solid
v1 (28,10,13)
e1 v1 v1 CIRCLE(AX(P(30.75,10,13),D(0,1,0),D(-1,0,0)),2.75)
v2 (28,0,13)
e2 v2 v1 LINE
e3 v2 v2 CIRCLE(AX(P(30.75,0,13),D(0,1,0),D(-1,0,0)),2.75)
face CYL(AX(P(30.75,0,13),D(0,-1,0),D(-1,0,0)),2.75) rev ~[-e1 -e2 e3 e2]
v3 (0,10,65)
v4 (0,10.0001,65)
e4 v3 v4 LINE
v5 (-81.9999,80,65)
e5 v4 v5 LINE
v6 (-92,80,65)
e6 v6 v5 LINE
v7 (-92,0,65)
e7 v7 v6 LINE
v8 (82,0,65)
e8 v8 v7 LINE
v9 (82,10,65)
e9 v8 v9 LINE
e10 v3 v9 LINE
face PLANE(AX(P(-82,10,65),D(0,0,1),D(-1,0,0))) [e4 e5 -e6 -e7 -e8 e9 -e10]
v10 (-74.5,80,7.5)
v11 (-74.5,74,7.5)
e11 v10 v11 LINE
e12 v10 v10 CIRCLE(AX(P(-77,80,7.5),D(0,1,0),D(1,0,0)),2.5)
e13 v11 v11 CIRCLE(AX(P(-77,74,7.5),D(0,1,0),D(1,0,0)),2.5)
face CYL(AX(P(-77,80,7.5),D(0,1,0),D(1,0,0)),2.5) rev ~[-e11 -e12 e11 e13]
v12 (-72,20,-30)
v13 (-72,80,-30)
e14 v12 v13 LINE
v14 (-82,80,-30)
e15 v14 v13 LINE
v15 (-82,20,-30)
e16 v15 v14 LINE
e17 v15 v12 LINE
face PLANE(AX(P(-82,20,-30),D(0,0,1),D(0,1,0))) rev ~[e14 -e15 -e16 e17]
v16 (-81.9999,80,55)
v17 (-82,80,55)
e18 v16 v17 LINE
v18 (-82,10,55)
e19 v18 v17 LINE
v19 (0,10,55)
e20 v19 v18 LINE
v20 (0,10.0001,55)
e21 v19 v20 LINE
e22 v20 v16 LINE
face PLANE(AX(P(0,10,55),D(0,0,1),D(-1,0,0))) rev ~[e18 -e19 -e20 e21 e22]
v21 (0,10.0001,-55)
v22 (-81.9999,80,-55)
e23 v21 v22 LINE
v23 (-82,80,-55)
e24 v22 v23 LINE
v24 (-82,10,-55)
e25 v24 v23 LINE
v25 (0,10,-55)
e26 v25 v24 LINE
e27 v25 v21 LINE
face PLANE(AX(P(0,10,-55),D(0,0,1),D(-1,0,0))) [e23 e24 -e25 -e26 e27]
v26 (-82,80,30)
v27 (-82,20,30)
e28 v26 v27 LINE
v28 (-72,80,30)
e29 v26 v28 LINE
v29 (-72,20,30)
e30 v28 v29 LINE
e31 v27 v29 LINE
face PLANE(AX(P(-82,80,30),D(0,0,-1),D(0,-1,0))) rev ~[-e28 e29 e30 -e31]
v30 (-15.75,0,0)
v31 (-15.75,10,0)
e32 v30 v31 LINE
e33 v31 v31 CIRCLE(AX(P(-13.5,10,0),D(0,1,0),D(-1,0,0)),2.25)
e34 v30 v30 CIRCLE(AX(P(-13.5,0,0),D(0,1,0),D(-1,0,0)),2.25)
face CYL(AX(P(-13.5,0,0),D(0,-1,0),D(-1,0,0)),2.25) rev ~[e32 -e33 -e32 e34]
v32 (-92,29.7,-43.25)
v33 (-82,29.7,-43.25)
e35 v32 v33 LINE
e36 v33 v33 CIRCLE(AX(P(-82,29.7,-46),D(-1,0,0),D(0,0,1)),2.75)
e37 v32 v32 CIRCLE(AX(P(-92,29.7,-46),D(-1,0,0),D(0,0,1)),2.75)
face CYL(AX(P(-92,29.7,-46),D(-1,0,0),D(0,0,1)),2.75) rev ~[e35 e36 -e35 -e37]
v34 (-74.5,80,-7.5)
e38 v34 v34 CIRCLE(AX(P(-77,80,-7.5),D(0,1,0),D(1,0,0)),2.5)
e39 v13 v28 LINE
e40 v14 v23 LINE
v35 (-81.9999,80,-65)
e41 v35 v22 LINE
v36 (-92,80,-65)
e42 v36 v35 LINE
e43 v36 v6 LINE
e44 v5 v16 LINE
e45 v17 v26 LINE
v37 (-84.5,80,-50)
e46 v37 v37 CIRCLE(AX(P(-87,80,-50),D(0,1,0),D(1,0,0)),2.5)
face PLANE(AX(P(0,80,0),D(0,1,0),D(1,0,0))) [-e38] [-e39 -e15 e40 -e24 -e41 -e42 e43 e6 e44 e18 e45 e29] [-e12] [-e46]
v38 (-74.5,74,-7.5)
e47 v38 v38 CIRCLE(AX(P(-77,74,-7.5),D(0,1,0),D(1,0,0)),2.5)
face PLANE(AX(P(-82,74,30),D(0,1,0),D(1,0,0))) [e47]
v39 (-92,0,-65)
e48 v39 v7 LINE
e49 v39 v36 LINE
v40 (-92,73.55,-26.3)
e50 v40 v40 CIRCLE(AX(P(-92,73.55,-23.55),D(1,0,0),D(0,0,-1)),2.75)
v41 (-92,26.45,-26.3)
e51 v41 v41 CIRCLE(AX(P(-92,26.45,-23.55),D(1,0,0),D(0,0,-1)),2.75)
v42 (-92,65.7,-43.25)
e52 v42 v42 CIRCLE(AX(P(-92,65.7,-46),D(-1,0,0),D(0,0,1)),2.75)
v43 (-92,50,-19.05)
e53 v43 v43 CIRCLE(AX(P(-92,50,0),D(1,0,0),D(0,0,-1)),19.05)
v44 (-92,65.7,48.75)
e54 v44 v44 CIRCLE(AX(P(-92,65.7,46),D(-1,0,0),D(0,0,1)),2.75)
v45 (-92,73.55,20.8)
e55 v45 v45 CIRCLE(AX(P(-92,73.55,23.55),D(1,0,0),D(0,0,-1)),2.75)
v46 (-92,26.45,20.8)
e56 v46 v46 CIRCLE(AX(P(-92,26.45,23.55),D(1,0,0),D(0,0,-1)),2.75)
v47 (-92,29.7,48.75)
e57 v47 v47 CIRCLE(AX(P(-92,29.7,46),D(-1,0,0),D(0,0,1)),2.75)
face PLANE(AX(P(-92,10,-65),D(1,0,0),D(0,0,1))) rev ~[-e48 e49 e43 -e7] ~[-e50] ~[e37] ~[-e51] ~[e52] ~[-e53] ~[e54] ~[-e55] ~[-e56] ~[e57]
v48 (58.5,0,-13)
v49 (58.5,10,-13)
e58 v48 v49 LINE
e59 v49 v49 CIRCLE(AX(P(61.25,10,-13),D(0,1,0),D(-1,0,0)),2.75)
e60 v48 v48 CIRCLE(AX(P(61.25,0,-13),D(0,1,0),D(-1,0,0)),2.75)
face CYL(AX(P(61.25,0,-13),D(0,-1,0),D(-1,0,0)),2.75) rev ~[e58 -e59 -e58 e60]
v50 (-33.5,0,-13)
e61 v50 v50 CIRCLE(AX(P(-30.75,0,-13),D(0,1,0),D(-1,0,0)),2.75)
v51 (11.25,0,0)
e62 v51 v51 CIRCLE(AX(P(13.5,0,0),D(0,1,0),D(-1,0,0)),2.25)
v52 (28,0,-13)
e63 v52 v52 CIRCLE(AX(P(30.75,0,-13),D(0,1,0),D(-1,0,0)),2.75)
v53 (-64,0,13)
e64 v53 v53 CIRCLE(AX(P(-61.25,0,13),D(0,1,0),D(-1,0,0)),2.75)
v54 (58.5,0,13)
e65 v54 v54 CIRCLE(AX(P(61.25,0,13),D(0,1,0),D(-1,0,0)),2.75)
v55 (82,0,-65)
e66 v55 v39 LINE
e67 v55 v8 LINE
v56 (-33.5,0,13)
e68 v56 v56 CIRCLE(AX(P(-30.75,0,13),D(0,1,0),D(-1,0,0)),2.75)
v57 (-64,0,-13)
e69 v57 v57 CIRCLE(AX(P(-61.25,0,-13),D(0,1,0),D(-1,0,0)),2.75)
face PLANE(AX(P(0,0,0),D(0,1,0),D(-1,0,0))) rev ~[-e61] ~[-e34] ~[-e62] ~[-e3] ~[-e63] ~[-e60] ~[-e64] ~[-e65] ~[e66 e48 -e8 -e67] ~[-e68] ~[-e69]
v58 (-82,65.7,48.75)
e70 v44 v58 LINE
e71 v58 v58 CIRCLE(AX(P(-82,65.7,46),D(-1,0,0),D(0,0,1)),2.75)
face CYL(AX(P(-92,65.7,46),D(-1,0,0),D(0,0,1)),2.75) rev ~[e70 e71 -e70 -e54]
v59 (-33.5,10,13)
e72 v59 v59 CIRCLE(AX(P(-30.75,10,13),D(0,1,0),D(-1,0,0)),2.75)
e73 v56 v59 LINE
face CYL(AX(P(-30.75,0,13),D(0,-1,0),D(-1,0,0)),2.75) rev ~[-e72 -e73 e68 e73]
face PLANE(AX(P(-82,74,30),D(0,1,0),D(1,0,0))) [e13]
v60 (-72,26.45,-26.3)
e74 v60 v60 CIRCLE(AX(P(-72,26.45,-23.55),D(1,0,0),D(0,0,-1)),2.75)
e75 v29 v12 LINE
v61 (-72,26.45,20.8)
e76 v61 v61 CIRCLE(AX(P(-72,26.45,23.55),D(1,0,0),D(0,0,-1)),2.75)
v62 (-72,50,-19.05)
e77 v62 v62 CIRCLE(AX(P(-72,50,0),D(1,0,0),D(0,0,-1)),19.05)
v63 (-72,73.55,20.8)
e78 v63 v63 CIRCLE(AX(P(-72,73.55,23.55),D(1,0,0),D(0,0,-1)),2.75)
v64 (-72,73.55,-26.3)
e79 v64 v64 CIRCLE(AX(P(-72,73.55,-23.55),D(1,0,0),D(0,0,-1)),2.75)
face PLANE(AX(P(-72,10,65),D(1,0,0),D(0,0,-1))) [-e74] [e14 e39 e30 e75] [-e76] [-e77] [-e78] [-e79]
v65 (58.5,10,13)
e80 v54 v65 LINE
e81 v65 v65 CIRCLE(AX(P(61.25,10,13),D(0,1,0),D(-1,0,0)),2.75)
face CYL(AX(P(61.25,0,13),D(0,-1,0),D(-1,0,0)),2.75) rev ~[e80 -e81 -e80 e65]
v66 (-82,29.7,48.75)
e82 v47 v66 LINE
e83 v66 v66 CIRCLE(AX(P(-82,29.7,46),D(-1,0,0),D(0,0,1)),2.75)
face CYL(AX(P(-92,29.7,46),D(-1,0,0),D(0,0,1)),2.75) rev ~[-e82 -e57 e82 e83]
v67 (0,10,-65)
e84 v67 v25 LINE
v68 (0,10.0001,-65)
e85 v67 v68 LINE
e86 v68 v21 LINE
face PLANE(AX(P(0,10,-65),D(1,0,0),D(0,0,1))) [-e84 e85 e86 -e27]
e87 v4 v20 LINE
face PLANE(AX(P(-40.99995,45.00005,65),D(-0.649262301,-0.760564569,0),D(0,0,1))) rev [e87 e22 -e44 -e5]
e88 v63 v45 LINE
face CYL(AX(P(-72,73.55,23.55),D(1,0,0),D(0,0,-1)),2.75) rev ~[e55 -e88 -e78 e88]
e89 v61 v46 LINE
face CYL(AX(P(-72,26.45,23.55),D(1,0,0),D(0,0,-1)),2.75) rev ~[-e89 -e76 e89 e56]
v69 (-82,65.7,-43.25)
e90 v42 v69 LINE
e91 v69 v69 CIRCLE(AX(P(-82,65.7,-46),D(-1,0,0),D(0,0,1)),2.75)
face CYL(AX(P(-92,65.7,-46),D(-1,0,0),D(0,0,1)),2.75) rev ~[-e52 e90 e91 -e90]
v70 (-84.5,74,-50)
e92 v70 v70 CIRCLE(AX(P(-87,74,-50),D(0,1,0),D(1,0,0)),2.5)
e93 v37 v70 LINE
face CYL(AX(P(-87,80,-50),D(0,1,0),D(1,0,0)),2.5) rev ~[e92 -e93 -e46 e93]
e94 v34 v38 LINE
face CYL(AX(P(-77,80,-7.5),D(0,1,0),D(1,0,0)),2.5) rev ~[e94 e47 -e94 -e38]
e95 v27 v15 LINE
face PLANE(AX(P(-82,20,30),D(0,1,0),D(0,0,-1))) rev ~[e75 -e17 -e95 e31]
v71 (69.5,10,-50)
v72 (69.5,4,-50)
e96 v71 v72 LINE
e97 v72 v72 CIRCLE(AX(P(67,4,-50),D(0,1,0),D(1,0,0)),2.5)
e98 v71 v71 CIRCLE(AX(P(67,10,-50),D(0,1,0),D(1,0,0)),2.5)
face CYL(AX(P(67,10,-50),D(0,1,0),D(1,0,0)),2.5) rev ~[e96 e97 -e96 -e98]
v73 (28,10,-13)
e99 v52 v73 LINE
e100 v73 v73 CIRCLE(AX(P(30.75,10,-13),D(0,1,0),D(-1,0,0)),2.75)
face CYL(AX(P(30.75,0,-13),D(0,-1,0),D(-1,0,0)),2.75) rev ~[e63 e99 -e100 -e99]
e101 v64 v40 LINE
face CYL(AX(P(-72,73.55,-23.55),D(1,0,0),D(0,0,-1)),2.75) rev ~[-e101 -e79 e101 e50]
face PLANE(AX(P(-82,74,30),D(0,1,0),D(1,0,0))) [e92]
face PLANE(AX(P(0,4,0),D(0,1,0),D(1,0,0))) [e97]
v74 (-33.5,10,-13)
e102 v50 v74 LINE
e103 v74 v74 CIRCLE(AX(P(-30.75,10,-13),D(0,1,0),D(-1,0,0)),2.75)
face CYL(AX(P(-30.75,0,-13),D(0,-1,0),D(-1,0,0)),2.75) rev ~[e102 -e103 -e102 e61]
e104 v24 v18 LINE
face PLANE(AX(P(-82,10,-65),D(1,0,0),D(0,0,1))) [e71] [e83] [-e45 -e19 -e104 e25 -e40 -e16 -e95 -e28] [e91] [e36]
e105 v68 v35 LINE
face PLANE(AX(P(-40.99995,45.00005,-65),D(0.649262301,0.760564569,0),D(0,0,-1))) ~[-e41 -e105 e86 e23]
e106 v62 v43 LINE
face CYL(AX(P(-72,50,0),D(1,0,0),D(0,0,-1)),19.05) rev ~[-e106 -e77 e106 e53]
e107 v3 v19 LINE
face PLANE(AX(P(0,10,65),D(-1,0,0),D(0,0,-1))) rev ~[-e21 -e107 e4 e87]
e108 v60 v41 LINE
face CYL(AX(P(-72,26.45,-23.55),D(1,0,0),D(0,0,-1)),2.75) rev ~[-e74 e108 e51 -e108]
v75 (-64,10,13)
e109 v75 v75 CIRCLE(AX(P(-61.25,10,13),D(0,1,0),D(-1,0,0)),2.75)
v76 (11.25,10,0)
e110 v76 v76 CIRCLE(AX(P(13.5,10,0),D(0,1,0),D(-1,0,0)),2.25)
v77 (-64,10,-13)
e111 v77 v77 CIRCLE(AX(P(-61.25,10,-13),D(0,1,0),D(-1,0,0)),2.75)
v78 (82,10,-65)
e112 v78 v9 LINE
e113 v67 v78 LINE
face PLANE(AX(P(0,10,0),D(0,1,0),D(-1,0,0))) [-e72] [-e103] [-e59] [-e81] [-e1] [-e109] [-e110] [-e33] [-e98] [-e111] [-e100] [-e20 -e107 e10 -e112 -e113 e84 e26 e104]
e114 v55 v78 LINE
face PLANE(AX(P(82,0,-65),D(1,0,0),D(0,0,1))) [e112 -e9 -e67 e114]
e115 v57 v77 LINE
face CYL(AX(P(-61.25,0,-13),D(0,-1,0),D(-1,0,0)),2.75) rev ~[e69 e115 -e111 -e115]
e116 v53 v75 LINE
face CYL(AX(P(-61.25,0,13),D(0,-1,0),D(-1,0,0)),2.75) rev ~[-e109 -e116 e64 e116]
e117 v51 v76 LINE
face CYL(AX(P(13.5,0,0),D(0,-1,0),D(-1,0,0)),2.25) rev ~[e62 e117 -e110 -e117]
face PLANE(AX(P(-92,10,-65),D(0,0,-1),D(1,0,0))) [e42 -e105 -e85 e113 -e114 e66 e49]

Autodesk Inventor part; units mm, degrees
ref_plane "YZ Plane" through (0, 0, 0) normal (1, 0, 0) x (0, 1, 0)
ref_plane "XZ Plane" through (0, 0, 0) normal (0, 1, 0) x (-1, 0, 0)
ref_plane "XY Plane" through (0, 0, 0) normal (0, 0, 1) x (1, 0, 0)
sketch "Sketch1" plane through (0, 0, 0) normal (0, 1, 0) x (-1, 0, 0)
  line L0 (20, -4.85) -> (-20, -4.85) construction
  line L1 (-20, -4.85) -> (-20, 4.85) construction
  line L2 (-20, 4.85) -> (20, 4.85) construction
  line L3 (20, 4.85) -> (20, -4.85) construction
  line L4 (0, -4.85) -> (0, 4.85) construction
  line L5 (20, 0) -> (-20, 0) construction
  circle A0 centre (13.5, 0) radius 2.25
  circle A1 centre (-13.5, 0) radius 2.25
  line L6 (67, -18) -> (25, -18) construction
  line L7 (25, -18) -> (25, 18) construction
  line L8 (25, 18) -> (67, 18) construction
  line L9 (67, 18) -> (67, -18) construction
  line L10 (46, -18) -> (46, 18) construction
  line L11 (67, 0) -> (25, 0) construction
  circle A2 centre (61.25, -13) radius 2.75
  circle A3 centre (30.75, -13) radius 2.75
  circle A4 centre (61.25, 13) radius 2.75
  circle A5 centre (30.75, 13) radius 2.75
  line L12 (-67, -18) -> (-25, -18) construction
  line L13 (-25, -18) -> (-25, 18) construction
  line L14 (-25, 18) -> (-67, 18) construction
  line L15 (-67, 18) -> (-67, -18) construction
  line L16 (-46, -18) -> (-46, 18) construction
  line L17 (-67, 0) -> (-25, 0) construction
  circle A6 centre (-61.25, -13) radius 2.75
  circle A7 centre (-30.75, -13) radius 2.75
  circle A8 centre (-61.25, 13) radius 2.75
  circle A9 centre (-30.75, 13) radius 2.75
  line L18 (82, -65) -> (-82, -65)
  line L19 (-82, -65) -> (-82, 65)
  line L20 (-82, 65) -> (82, 65)
  line L21 (82, 65) -> (82, -65)
  point P0 (0, 0)
  point P1 (0, 0)
  dimension "d0" = 40
  dimension "d1" = 9.7
  dimension "d2" = 4.5
  dimension "d3" = 27
  dimension "d4" = 42
  dimension "d6" = 36
  dimension "d7" = 5
  dimension "d8" = 5.5
  dimension "d9" = 30.5
  dimension "d10" = 26
  dimension "d12" = 15
  dimension "d16" = 130
extrude "Extrusion1" add sketch "Sketch1" along normal blind 10
sketch "Sketch5" plane through (-82, 0, -65) normal (-1, 0, 0) x (0, 0, 1)
  line L0 (0, 0) -> (130, 0) projected
  line L1 (130, 0) -> (130, 10) projected
  line L2 (0, 10) -> (130, 10) projected
  line L3 (0, 0) -> (0, 10) projected
  point P0 (65, 0)
extrude "Extrusion4" add sketch "Sketch5" along normal blind 10
sketch "Sketch6" plane through (0, 10, 0) normal (0, 1, 0) x (1, 0, 0)
  line L0 (-92, 65) -> (-92, -65) projected
  line L1 (82, -65) -> (-92, -65) projected
  line L2 (-92, 65) -> (-82, 65)
  line L3 (-82, 65) -> (-82, -65)
  line L4 (-82, -65) -> (-92, -65)
  line L5 (-92, -65) -> (-92, 65)
  point P0 (0, 0)
  dimension "d33" = 10
extrude "Extrusion5" add sketch "Sketch6" along normal blind 80
sketch "Sketch7" plane through (-82, 10, 65) normal (1, 0, 0) x (0, 0, -1)
  line L0 (35, 10) -> (95, 10)
  line L1 (95, 10) -> (95, 70)
  line L2 (95, 70) -> (35, 70)
  line L3 (35, 70) -> (35, 10)
  line L4 (130, 80) -> (0, 80) construction
  line L5 (65, 80) -> (65, 0) construction
  line L6 (62.75, 0) -> (67.25, 0) construction
  line L7 (0, -10) -> (0, 80) construction
  line L8 (130, -10) -> (130, 80) construction
  line L9 (130, 40) -> (0, 40) construction
  point P0 (65, -10)
  dimension "d36" = 60
  dimension "d37" = 60
  dimension "d38" = 40
extrude "Extrusion6" add sketch "Sketch7" along normal blind 10
sketch "Sketch8" plane through (0, 90, 0) normal (0, 1, 0) x (1, 0, 0)
  line L0 (-92, 65) -> (-92, -65) projected
  line L1 (-92, -65) -> (-82, -65) projected
  line L2 (-82, -65) -> (-82, 65) projected
  line L3 (-82, 65) -> (-92, 65) projected
  point P0 (0, 0)
extrude "Extrusion7" cut sketch "Sketch8" against normal up to surface (10 mm away)
sketch "Sketch9" plane through (-72, 10, 65) normal (1, 0, 0) x (0, 0, -1)
  line L0 (95, 10) -> (95, 70) construction
  line L1 (95, 70) -> (35, 70) construction
  line L2 (35, 70) -> (35, 10) construction
  line L3 (35, 10) -> (95, 10) construction
  line L4 (35, 10) -> (35, 70) construction
  line L5 (35, 40) -> (95, 40) construction
  line L6 (95, 10) -> (95, 70) construction
  line L7 (35, 10) -> (95, 10) construction
  line L8 (65, 10) -> (65, 70) construction
  line L9 (95, 70) -> (35, 70) construction
  line L10 (41.45, 63.55) -> (88.55, 63.55) construction
  line L11 (88.55, 63.55) -> (88.55, 16.45) construction
  line L12 (88.55, 16.45) -> (41.45, 16.45) construction
  line L13 (41.45, 16.45) -> (41.45, 63.55) construction
  circle A0 centre (41.45, 63.55) radius 2.75
  circle A1 centre (41.45, 16.45) radius 2.75
  circle A2 centre (88.55, 16.45) radius 2.75
  circle A3 centre (88.55, 63.55) radius 2.75
  circle A4 centre (65, 40) radius 19.05
  point P0 (65, -10)
  dimension "d43" = 47.1
  dimension "d44" = 47.1
  dimension "d45" = 5.5
  dimension "d46" = 5.5
  dimension "d47" = 5.5
  dimension "d48" = 5.5
  dimension "d51" = 38.1
extrude "Extrusion8" cut sketch "Sketch9" against normal through all
sketch "Sketch10" plane through (-92, 0, -65) normal (-1, 0, 0) x (0, 0, 1)
  circle A0 centre (65, 50) radius 19.05 projected
  line L0 (65, 50) -> (0, 50) construction
  line L1 (0, 10) -> (0, 80) projected
  line L2 (65, 50) -> (130, 50) construction
  line L3 (130, 10) -> (130, 80) projected
  line L4 (5, 71.2) -> (33, 71.2) construction
  line L5 (33, 71.2) -> (33, 24.2) construction
  line L6 (33, 24.2) -> (5, 24.2) construction
  line L7 (5, 24.2) -> (5, 71.2) construction
  line L8 (5, 47.7) -> (33, 47.7) construction
  line L9 (65, 50) -> (65, 0) construction
  line L10 (19, 71.2) -> (19, 24.2) construction
  circle A1 centre (19, 65.7) radius 2.75
  circle A2 centre (19, 29.7) radius 2.75
  circle A3 centre (111, 65.7) radius 2.75
  circle A4 centre (111, 29.7) radius 2.75
  point P0 (180, 80)
  dimension "d52" = 28
  dimension "d53" = 47
  dimension "d54" = 2.3
  dimension "d55" = 46
  dimension "d56" = 5.5
  dimension "d57" = 36
extrude "Extrusion9" cut sketch "Sketch10" against normal through all contours A1 | A2 | A3 | A4
sketch "Sketch12" plane through (0, 10, 0) normal (0, 1, 0) x (1, 0, 0)
  line L0 (82, 65) -> (-82, 65) projected
  line L1 (-82, 65) -> (0, 65)
  line L2 (0, 65) -> (0, 55)
  line L3 (0, 55) -> (-82, 55)
  line L4 (-82, 55) -> (-82, 65)
  line L5 (82, -65) -> (82, 65) construction
  line L6 (82, 0) -> (-92, 0) construction
  line L7 (-92, 65) -> (-92, -65) construction
  line L8 (-82, -65) -> (0, -65)
  line L9 (0, -65) -> (0, -55)
  line L10 (0, -55) -> (-82, -55)
  line L11 (-82, -55) -> (-82, -65)
  point P0 (0, 0)
  dimension "d70" = 82
  dimension "d71" = 10
extrude "Extrusion11" add sketch "Sketch12" along normal up to surface (70 mm away)
chamfer "Chamfer3" distance 70 distance2 82 1 edges at (0, 80, -60) measured on face at (0, 33.3333, -58.3333)
chamfer "Chamfer4" distance 70 distance2 82 1 edges at (0, 80, 60) measured on face at (0, 33.3333, 61.6667)
sketch "Sketch14" plane through (-82, 80, 30) normal (0, 1, 0) x (1, 0, 0)
  line L0 (10, 0) -> (10, 60) construction
  line L1 (-10, 95) -> (-10, -35) construction
  line L2 (10, 0) -> (-10, 0) construction
  line L3 (-10, 0) -> (-10, 60) construction
  line L4 (-10, 60) -> (10, 60) construction
  line L5 (10, 60) -> (10, 0) construction
  line L6 (10, 30) -> (-10, 30) construction
  circle A0 centre (5, 22.5) radius 2.5
  circle A1 centre (5, 37.5) radius 2.5
  point P0 (82, 30)
  dimension "d83" = 60
  dimension "d84" = 5
  dimension "d85" = 15
  dimension "d86" = 15
extrude "Extrusion12" cut sketch "Sketch14" against normal blind 6
sketch "Sketch15" plane through (0, 10, 0) normal (0, 1, 0) x (1, 0, 0)
  line L0 (82, 65) -> (0, 65) construction
  line L1 (82, 65) -> (67, 65) construction
  line L2 (67, 65) -> (67, 50) construction
  line L3 (67, 50) -> (82, 50) construction
  line L4 (82, 50) -> (82, 65) construction
  circle A0 centre (67, 50) radius 2.5
  point P0 (0, 0)
  dimension "d89" = 15
  dimension "d90" = 15
  dimension "d91" = 5
extrude "Extrusion13" cut sketch "Sketch15" against normal blind 6
sketch "Sketch16" plane through (-82, 80, 30) normal (0, 1, 0) x (1, 0, 0)
  line L0 (0, 95) -> (0, 85) construction
  line L1 (-10, 95) -> (-10, -35) construction
  line L2 (0, 85) -> (-10, 85) construction
  line L3 (-10, 85) -> (-10, 80) construction
  line L4 (-10, 80) -> (0, 80) construction
  line L5 (0, 80) -> (0, 85) construction
  circle A0 centre (-5, 80) radius 2.5
  point P0 (82, 30)
  dimension "d94" = 5
  dimension "d95" = 5
extrude "Extrusion14" cut sketch "Sketch16" against normal blind 6
properties part number "positioner_base"
